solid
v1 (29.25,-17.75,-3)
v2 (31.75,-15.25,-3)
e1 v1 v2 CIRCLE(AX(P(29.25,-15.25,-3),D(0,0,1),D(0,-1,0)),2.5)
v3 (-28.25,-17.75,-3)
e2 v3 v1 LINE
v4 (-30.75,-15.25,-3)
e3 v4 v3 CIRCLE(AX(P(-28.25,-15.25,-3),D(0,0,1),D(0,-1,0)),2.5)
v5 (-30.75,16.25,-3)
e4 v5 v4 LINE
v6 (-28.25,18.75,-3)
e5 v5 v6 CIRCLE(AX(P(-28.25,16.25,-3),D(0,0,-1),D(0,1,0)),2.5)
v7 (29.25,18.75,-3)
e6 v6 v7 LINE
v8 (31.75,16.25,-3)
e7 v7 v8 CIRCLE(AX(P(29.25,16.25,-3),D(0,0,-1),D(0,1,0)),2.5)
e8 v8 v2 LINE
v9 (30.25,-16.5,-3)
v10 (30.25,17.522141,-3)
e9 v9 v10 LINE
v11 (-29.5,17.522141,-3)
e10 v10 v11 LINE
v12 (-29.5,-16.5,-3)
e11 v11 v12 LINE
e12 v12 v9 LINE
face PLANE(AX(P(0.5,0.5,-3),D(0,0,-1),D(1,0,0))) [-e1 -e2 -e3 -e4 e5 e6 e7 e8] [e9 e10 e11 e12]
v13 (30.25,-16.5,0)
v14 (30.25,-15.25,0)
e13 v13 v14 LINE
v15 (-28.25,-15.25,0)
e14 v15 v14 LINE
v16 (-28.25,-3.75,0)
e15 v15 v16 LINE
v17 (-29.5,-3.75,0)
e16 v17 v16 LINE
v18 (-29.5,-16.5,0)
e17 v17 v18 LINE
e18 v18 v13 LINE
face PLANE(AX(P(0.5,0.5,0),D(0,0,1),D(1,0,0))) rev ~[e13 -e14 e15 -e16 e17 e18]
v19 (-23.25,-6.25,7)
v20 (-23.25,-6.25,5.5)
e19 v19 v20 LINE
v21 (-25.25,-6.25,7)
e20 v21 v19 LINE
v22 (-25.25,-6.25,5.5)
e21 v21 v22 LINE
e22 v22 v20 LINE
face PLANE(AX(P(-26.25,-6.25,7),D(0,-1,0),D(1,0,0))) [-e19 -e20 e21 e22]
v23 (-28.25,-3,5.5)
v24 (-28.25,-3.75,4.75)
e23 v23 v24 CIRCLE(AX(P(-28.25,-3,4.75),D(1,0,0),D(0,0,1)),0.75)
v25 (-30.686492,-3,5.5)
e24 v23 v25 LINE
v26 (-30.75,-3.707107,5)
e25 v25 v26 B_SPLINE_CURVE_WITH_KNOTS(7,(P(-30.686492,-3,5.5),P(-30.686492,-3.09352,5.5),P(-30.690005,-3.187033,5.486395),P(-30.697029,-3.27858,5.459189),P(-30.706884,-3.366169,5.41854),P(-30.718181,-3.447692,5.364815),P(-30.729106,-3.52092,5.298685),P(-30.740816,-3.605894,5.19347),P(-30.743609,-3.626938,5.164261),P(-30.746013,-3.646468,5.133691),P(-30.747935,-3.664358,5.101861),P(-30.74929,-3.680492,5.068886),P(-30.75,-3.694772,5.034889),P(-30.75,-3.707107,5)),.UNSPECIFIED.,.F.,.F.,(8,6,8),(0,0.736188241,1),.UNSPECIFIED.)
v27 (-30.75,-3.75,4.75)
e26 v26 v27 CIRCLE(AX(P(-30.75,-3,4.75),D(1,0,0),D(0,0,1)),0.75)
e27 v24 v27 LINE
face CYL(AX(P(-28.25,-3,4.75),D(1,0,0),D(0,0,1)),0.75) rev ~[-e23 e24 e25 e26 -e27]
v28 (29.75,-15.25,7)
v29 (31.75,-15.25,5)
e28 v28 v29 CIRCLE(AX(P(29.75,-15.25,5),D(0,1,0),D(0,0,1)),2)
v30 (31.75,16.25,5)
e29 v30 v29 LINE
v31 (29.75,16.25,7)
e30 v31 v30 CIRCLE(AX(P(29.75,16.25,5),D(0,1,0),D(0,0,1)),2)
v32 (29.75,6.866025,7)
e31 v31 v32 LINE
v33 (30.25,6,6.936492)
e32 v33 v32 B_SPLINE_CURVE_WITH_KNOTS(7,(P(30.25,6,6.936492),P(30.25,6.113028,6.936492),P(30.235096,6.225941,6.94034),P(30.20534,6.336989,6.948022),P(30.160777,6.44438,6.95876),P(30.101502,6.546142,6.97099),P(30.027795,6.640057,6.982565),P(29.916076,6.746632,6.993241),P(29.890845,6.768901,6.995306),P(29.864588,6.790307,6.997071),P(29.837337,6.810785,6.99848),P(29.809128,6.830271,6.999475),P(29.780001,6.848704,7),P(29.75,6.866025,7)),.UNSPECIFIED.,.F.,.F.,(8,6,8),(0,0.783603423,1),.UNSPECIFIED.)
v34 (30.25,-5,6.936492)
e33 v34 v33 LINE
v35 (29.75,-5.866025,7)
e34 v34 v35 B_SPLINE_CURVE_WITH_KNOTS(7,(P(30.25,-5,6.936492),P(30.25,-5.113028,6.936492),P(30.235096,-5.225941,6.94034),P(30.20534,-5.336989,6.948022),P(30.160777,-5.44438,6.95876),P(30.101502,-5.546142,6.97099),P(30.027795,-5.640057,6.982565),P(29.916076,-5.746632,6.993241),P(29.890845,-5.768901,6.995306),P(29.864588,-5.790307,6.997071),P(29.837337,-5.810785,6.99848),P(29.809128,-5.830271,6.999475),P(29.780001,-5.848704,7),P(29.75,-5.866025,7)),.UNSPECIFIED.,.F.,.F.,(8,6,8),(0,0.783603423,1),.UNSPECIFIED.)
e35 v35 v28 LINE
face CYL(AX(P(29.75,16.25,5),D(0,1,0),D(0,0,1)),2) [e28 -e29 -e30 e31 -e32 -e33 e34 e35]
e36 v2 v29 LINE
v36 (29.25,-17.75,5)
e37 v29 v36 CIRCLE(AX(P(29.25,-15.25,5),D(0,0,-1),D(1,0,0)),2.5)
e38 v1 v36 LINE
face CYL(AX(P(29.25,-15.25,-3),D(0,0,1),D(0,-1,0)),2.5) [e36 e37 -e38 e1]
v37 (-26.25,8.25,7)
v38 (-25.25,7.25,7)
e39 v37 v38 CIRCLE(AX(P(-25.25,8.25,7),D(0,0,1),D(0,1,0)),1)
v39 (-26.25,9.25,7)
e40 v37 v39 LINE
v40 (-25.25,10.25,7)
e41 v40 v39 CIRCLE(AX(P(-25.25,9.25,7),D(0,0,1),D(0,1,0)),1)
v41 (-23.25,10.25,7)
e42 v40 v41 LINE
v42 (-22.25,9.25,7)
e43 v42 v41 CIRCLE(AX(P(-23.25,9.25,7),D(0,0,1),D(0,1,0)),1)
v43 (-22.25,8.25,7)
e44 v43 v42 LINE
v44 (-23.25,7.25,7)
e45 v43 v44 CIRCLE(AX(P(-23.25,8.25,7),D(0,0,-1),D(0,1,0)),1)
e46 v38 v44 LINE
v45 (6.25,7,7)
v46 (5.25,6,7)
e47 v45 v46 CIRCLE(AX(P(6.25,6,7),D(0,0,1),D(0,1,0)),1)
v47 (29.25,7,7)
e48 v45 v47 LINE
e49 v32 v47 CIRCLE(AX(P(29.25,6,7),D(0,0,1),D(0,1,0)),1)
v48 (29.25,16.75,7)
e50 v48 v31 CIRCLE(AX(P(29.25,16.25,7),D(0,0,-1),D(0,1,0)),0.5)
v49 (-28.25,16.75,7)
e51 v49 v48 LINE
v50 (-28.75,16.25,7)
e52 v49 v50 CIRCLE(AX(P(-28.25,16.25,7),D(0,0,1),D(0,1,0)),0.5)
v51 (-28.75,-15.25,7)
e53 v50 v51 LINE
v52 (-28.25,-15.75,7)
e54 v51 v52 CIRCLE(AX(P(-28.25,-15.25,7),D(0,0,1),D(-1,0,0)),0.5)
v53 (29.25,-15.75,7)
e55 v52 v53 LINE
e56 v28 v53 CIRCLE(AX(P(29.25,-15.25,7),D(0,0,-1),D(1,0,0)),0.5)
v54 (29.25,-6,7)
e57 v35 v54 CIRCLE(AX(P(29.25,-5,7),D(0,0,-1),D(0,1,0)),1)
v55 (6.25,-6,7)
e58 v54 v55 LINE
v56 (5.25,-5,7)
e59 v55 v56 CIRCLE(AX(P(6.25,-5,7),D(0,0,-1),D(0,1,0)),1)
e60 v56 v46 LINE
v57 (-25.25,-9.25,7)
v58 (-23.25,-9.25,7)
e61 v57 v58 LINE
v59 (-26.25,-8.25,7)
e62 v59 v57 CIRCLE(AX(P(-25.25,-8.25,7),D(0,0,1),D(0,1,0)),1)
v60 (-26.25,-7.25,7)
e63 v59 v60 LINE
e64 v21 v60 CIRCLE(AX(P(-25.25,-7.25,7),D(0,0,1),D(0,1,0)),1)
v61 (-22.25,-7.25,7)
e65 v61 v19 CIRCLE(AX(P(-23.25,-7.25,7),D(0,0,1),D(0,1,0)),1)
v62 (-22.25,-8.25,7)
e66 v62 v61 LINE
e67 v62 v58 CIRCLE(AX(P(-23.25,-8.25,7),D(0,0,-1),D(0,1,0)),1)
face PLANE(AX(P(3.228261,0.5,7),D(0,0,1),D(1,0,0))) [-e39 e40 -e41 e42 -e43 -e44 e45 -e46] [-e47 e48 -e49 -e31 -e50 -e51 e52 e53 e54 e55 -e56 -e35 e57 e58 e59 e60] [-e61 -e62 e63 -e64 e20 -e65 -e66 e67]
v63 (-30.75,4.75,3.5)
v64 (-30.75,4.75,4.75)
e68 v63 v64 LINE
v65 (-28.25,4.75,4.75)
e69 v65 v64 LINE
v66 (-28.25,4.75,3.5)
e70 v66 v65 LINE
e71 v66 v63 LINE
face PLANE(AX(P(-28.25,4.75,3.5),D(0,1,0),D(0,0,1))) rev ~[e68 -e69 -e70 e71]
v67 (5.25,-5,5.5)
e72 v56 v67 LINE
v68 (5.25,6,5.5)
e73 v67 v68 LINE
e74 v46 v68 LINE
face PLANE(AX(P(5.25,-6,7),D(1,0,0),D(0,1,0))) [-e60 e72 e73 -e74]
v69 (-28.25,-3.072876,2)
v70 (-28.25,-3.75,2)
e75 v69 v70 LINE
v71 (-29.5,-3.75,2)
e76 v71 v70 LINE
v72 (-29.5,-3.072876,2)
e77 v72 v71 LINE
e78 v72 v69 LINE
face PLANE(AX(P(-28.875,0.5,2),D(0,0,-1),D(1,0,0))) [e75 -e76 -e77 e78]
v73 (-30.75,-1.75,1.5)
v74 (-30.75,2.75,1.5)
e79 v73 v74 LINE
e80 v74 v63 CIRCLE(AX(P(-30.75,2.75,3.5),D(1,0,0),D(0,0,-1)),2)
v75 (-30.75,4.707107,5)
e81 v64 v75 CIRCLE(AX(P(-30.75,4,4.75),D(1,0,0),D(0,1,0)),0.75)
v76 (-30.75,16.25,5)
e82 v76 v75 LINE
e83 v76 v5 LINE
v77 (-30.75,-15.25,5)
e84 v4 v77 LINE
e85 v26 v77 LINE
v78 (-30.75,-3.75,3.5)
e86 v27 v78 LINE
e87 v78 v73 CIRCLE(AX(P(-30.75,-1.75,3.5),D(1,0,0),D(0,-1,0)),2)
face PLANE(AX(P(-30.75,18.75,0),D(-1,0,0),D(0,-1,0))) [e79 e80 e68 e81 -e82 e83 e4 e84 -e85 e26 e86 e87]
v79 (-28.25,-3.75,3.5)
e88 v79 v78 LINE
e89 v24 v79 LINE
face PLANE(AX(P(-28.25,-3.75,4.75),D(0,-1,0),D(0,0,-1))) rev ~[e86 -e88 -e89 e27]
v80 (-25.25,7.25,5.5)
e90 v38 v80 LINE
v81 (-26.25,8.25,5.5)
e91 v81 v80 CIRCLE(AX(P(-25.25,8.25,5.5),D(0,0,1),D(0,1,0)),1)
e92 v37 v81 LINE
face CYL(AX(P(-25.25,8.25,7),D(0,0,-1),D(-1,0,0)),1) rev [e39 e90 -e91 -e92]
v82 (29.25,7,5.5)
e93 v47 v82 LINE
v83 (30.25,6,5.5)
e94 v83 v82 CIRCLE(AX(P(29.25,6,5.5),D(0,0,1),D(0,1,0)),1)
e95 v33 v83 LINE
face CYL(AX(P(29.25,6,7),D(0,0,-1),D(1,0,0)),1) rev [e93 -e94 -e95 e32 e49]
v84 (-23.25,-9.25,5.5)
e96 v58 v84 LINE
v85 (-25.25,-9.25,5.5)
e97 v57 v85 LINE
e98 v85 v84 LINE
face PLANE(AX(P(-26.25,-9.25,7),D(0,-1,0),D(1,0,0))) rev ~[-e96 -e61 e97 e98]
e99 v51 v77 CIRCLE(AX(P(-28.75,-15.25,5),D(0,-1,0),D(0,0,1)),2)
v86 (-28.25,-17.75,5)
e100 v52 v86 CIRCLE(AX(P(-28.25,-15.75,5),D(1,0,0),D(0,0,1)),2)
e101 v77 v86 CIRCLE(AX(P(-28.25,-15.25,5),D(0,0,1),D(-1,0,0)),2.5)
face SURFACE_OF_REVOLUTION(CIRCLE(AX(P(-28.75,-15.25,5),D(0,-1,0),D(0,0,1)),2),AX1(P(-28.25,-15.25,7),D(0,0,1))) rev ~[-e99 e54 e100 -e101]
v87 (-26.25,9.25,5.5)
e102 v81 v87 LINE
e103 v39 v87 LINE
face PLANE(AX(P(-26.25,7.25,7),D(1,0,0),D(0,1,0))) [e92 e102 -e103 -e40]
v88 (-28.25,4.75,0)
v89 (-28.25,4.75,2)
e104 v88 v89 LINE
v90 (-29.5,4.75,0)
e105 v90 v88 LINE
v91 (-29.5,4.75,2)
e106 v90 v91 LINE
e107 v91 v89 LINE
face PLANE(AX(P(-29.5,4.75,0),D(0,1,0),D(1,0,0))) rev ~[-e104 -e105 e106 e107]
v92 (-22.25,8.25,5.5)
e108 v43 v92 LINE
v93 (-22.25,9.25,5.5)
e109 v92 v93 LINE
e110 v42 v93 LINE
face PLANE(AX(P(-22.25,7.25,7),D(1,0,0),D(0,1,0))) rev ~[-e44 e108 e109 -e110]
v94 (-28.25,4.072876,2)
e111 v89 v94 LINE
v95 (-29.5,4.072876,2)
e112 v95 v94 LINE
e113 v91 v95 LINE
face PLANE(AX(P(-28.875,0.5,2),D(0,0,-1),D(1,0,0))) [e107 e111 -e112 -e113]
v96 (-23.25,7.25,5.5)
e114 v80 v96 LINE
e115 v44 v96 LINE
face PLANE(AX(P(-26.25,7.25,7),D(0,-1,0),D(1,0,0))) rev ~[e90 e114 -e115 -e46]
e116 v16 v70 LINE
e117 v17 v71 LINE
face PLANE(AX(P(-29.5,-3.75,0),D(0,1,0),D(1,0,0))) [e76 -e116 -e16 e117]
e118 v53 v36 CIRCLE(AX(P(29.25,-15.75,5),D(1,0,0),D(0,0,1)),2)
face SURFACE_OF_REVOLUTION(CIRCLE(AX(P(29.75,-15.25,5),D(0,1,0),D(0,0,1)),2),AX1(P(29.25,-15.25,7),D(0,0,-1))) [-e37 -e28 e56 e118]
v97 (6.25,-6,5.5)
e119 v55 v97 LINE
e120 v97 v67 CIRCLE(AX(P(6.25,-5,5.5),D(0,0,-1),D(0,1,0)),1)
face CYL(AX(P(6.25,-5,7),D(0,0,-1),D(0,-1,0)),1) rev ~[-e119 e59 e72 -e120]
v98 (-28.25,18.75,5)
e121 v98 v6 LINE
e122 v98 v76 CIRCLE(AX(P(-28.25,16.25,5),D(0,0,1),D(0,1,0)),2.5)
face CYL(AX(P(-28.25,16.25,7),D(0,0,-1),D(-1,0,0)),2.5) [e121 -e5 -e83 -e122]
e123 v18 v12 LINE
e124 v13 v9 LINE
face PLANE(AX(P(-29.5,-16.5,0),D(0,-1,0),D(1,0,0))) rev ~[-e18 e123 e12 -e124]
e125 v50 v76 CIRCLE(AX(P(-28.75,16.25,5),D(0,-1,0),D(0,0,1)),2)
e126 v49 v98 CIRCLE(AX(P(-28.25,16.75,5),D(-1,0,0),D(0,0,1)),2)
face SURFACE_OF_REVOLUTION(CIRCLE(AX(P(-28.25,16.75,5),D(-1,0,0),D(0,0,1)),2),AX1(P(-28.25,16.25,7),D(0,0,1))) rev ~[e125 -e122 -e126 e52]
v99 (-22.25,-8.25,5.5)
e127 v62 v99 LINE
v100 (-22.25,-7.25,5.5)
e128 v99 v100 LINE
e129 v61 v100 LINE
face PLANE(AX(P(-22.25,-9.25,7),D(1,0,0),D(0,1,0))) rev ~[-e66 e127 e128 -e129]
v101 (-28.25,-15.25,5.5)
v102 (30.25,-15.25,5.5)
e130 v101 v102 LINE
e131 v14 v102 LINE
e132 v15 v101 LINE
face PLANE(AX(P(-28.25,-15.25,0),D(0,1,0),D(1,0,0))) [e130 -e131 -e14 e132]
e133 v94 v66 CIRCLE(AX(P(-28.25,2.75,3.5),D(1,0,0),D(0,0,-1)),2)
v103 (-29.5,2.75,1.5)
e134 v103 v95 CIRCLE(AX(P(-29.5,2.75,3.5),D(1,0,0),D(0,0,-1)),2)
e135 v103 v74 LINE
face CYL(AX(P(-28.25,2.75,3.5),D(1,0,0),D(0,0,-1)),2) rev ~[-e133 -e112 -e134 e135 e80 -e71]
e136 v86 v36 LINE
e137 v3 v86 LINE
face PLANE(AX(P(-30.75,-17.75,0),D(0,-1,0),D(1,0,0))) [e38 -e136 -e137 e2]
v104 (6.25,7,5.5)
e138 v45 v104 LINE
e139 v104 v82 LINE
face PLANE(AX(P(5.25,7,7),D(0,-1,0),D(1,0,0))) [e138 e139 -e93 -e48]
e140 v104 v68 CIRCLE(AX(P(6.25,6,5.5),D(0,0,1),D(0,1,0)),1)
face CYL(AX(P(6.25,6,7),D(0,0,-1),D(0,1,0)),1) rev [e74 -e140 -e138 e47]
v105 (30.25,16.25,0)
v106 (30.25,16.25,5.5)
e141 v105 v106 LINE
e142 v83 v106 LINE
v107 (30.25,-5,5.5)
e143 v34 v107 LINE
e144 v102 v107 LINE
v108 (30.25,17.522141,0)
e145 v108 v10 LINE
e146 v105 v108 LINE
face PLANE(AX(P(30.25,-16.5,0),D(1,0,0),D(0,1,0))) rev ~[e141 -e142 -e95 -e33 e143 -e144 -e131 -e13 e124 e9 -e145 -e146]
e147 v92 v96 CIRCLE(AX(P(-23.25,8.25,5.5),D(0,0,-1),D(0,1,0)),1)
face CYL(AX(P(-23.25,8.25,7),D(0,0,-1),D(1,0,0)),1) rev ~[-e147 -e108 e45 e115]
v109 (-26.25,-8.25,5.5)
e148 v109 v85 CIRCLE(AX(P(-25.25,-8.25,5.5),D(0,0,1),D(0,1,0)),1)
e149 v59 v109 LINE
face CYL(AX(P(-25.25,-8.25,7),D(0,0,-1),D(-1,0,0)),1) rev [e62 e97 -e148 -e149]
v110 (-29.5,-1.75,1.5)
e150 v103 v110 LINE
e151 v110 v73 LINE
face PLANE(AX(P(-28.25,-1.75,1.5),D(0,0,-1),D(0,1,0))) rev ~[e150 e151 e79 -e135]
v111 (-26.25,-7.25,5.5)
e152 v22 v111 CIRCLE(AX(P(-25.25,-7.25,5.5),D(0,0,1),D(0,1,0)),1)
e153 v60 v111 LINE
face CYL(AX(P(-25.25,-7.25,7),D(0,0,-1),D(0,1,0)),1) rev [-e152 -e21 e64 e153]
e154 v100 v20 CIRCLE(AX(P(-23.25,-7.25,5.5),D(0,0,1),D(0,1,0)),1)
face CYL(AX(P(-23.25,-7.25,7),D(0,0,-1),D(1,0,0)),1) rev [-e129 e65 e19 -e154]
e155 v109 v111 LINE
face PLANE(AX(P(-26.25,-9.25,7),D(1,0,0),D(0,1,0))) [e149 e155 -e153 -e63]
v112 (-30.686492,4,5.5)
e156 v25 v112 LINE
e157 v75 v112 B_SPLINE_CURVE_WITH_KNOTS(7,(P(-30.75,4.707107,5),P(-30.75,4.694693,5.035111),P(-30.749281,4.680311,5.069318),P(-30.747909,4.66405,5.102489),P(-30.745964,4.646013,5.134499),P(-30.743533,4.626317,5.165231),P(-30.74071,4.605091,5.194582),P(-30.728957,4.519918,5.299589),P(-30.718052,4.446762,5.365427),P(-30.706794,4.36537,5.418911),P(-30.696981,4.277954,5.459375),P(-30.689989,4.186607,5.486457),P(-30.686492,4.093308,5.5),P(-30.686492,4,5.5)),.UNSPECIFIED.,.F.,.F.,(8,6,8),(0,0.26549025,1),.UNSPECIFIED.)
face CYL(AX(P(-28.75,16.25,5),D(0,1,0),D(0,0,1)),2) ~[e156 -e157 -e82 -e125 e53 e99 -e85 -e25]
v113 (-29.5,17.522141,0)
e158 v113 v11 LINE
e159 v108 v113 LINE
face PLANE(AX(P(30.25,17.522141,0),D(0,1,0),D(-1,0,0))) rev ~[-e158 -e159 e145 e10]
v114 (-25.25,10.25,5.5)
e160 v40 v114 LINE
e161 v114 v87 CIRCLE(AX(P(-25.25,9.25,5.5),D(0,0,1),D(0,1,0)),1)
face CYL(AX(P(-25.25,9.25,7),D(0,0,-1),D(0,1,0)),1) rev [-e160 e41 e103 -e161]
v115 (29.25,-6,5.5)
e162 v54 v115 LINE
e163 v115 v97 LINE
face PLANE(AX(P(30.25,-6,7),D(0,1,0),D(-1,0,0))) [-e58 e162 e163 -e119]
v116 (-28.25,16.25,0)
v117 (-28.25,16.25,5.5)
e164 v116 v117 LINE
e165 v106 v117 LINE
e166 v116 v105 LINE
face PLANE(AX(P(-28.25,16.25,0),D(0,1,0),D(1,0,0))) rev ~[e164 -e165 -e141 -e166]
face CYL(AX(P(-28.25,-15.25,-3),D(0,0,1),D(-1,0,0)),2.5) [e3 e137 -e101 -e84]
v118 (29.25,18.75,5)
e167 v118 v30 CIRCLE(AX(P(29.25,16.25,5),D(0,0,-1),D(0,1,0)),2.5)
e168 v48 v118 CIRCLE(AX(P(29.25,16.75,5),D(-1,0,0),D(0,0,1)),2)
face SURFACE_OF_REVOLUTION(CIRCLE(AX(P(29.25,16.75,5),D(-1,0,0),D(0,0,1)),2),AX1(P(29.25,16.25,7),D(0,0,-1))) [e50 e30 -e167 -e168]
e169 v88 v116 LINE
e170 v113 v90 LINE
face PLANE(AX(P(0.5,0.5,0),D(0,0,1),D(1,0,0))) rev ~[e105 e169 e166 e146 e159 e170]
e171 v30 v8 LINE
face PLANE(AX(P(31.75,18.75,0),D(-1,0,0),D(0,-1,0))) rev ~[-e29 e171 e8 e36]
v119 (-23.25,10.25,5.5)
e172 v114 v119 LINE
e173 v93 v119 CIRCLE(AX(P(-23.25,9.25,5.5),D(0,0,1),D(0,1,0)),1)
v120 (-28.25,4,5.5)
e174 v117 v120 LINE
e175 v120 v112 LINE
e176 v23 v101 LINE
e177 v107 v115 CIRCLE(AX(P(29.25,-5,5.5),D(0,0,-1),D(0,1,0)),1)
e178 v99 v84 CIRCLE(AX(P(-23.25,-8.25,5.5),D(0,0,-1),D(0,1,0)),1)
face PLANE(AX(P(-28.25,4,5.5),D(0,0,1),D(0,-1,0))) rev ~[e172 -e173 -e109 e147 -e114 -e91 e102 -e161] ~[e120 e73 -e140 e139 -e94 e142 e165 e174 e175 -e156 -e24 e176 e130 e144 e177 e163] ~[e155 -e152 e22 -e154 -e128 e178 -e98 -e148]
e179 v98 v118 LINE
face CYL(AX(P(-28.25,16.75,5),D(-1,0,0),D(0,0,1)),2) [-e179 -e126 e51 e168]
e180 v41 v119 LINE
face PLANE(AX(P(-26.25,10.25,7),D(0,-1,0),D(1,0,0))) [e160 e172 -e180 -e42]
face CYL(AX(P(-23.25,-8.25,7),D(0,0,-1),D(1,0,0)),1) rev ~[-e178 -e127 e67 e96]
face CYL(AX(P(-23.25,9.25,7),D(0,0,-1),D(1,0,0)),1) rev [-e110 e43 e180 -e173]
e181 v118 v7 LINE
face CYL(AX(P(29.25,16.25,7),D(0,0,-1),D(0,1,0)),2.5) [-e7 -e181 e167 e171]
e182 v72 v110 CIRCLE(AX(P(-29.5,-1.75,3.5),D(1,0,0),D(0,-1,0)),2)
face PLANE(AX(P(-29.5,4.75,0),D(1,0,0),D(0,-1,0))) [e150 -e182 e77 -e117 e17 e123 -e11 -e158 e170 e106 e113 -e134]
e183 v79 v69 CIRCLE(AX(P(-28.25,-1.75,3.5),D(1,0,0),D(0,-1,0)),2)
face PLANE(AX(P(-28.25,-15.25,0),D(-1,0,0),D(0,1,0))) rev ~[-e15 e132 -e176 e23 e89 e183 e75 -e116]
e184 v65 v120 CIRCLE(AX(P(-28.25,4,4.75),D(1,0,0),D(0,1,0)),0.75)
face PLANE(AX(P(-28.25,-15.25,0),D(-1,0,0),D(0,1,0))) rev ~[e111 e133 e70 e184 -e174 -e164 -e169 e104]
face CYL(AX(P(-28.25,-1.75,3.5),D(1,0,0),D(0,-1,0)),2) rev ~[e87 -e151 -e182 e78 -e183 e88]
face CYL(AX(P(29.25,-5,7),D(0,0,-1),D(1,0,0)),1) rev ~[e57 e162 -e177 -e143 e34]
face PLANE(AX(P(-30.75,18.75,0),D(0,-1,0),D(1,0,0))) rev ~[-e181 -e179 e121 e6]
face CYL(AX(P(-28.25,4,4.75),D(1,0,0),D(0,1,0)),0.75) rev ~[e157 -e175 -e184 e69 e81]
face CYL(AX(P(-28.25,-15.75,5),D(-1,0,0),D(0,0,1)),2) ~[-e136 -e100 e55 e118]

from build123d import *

# Parameters (mm, degrees)
F0_W          = 62.5
F0_H          = 36.5
F0_W_2        = 58.5
F0_H_2        = 31.5
F1_DEPTH      = 7
F2_W          = 4
F2_H          = 3
F3_DEPTH      = 1.5
F4_W          = 62.5
F4_H          = 36.5
F5_DEPTH      = 3
F7_DEPTH      = 2.5
F8_R          = 2.5
F9_R          = 1
F10_R         = 1
F11_T1_DEPTH  = 57.5
F11_T3_DEPTH  = 31.5
F11_T6_ANGLE  = 90
F11_T8_ANGLE  = 90
F11_T10_ANGLE = 90
F11_T12_ANGLE = 90
F12_W         = 1.25
F12_H         = 8.5
F13_DEPTH     = 2


# Not quite as in the source:
# - a fillet or chamfer that OpenCascade refuses, or shapes differently, is made with other operations: its cross-section is extruded or revolved along the edge and cut away or added


with BuildPart() as f1:
    # F0 (on Top) → F1 (new body)
    with BuildSketch(Plane.XY):
        with Locations((0.5, 0.5)):
            Rectangle(F0_W, F0_H)
        with Locations((1, 0.5)):
            Rectangle(F0_W_2, F0_H_2, mode=Mode.SUBTRACT)
    extrude(amount=F1_DEPTH)

    # F2 (on face) → F3 (join)
    with BuildSketch(Plane.XY.offset(7)):
        Polygon((30.25, 16.25), (-28.25, 16.25), (-28.25, -15.25), (30.25, -15.25), (30.25, -6), (5.25, -6), (5.25, 7), (30.25, 7), align=None)
        with Locations((-24.25, -7.75)):
            Rectangle(F2_W, F2_H, mode=Mode.SUBTRACT)
        with Locations((-24.25, 8.75)):
            Rectangle(F2_W, F2_H, mode=Mode.SUBTRACT)
    extrude(amount=-F3_DEPTH)

    # F4 (on face) → F5 (join)
    with BuildSketch(Plane(origin=(0, 0, 0), x_dir=(1, 0, 0), z_dir=(0, 0, -1))):
        with Locations((0.5, -0.5)):
            Rectangle(F4_W, F4_H)
        Polygon((-29.5, -17.522141248), (-29.5, 16.5), (30.25, 16.5), (30.25, 15.25), (30.25, -16.25), (30.25, -17.522141248), align=None, mode=Mode.SUBTRACT)
    extrude(amount=F5_DEPTH)

    # F6 (on face) → F7 (cut)
    with BuildSketch(Plane.YZ.offset(-28.25)):
        with BuildLine():
            Line((4, 5.5), (-3, 5.5))
            ThreePointArc((-3, 5.5), (-3.5303300859, 5.2803300859), (-3.75, 4.75))
            Line((-3.75, 4.75), (-3.75, 3.5))
            ThreePointArc((-3.75, 3.5), (-3.1642135624, 2.0857864376), (-1.75, 1.5))
            Line((-1.75, 1.5), (2.75, 1.5))
            ThreePointArc((2.75, 1.5), (4.1642135624, 2.0857864376), (4.75, 3.5))
            Line((4.75, 3.5), (4.75, 4.75))
            ThreePointArc((4.75, 4.75), (4.5303300859, 5.2803300859), (4, 5.5))
        make_face()
    extrude(amount=-F7_DEPTH, mode=Mode.SUBTRACT)

    # F8
    f8_edges = [f1.edges().sort_by_distance(p)[0] for p in [
        (-30.75, 18.75, 2),
        (-30.75, -17.75, 2),
        (31.75, 18.75, 2),
        (31.75, -17.75, 2),
    ]]
    fillet(f8_edges, radius=F8_R)

    # F9
    f9_edges = [f1.edges().sort_by_distance(p)[0] for p in [
        (5.25, 7, 6.25),
        (30.25, 7, 6.25),
        (30.25, -6, 6.25),
        (5.25, -6, 6.25),
    ]]
    fillet(f9_edges, radius=F9_R)

    # F10
    f10_edges = [f1.edges().sort_by_distance(p)[0] for p in [
        (-22.25, 10.25, 6.25),
        (-26.25, 10.25, 6.25),
        (-26.25, 7.25, 6.25),
        (-22.25, 7.25, 6.25),
        (-26.25, -6.25, 6.25),
        (-22.25, -6.25, 6.25),
        (-22.25, -9.25, 6.25),
        (-26.25, -9.25, 6.25),
    ]]
    fillet(f10_edges, radius=F10_R)

    # F11: fillet of radius 2 on 8 edges, made by hand

    # F11_s2 → F11_t1 (cut)
    with BuildSketch(Plane.YZ.offset(-28.25)):
        with BuildLine():
            ThreePointArc((-15.75, 7), (-17.1642135624, 6.4142135624), (-17.75, 5))
            Line((-17.75, 5), (-17.75, 7))
            Line((-17.75, 7), (-15.75, 7))
        make_face()
        with BuildLine():
            ThreePointArc((16.75, 7), (18.1642135624, 6.4142135624), (18.75, 5))
            Line((18.75, 5), (18.75, 7))
            Line((18.75, 7), (16.75, 7))
        make_face()
    extrude(amount=F11_T1_DEPTH, mode=Mode.SUBTRACT)

    # F11_s4 → F11_t3 (cut)
    with BuildSketch(Plane.XZ.offset(-16.25)):
        with BuildLine():
            ThreePointArc((29.75, 7), (31.1642135624, 6.4142135624), (31.75, 5))
            Line((31.75, 5), (31.75, 7))
            Line((31.75, 7), (29.75, 7))
        make_face()
        with BuildLine():
            ThreePointArc((-28.75, 7), (-30.1642135624, 6.4142135624), (-30.75, 5))
            Line((-30.75, 5), (-30.75, 7))
            Line((-30.75, 7), (-28.75, 7))
        make_face()
    extrude(amount=F11_T3_DEPTH, mode=Mode.SUBTRACT)

    # F11_s5 → F11_t6 (revolve, cut)
    with BuildSketch(Plane.YZ.offset(29.25)):
        with BuildLine():
            ThreePointArc((16.75, 7), (18.1642135624, 6.4142135624), (18.75, 5))
            Line((18.75, 5), (18.75, 7))
            Line((18.75, 7), (16.75, 7))
        make_face()
    revolve(axis=Axis((29.25, 16.25, 7), (0, 0, -1)), revolution_arc=F11_T6_ANGLE, mode=Mode.SUBTRACT)

    # F11_s7 → F11_t8 (revolve, cut)
    with BuildSketch(Plane.YZ.offset(-28.25)):
        with BuildLine():
            ThreePointArc((16.75, 7), (18.1642135624, 6.4142135624), (18.75, 5))
            Line((18.75, 5), (18.75, 7))
            Line((18.75, 7), (16.75, 7))
        make_face()
    revolve(axis=Axis((-28.25, 16.25, 7), (0, 0, 1)), revolution_arc=F11_T8_ANGLE, mode=Mode.SUBTRACT)

    # F11_s9 → F11_t10 (revolve, cut)
    with BuildSketch(Plane.XZ.offset(15.25)):
        with BuildLine():
            ThreePointArc((29.75, 7), (31.1642135624, 6.4142135624), (31.75, 5))
            Line((31.75, 5), (31.75, 7))
            Line((31.75, 7), (29.75, 7))
        make_face()
    revolve(axis=Axis((29.25, -15.25, 7), (0, 0, -1)), revolution_arc=F11_T10_ANGLE, mode=Mode.SUBTRACT)

    # F11_s11 → F11_t12 (revolve, cut)
    with BuildSketch(Plane.XZ.offset(15.25)):
        with BuildLine():
            ThreePointArc((-28.75, 7), (-30.1642135624, 6.4142135624), (-30.75, 5))
            Line((-30.75, 5), (-30.75, 7))
            Line((-30.75, 7), (-28.75, 7))
        make_face()
    revolve(axis=Axis((-28.25, -15.25, 7), (0, 0, 1)), revolution_arc=F11_T12_ANGLE, mode=Mode.SUBTRACT)

    # F12 (on face) → F13 (cut)
    with BuildSketch(Plane(origin=(0, 0, 0), x_dir=(1, 0, 0), z_dir=(0, 0, -1))):
        with Locations((-28.875, -0.5)):
            Rectangle(F12_W, F12_H)
    extrude(amount=-F13_DEPTH, mode=Mode.SUBTRACT)


solid = f1.part
